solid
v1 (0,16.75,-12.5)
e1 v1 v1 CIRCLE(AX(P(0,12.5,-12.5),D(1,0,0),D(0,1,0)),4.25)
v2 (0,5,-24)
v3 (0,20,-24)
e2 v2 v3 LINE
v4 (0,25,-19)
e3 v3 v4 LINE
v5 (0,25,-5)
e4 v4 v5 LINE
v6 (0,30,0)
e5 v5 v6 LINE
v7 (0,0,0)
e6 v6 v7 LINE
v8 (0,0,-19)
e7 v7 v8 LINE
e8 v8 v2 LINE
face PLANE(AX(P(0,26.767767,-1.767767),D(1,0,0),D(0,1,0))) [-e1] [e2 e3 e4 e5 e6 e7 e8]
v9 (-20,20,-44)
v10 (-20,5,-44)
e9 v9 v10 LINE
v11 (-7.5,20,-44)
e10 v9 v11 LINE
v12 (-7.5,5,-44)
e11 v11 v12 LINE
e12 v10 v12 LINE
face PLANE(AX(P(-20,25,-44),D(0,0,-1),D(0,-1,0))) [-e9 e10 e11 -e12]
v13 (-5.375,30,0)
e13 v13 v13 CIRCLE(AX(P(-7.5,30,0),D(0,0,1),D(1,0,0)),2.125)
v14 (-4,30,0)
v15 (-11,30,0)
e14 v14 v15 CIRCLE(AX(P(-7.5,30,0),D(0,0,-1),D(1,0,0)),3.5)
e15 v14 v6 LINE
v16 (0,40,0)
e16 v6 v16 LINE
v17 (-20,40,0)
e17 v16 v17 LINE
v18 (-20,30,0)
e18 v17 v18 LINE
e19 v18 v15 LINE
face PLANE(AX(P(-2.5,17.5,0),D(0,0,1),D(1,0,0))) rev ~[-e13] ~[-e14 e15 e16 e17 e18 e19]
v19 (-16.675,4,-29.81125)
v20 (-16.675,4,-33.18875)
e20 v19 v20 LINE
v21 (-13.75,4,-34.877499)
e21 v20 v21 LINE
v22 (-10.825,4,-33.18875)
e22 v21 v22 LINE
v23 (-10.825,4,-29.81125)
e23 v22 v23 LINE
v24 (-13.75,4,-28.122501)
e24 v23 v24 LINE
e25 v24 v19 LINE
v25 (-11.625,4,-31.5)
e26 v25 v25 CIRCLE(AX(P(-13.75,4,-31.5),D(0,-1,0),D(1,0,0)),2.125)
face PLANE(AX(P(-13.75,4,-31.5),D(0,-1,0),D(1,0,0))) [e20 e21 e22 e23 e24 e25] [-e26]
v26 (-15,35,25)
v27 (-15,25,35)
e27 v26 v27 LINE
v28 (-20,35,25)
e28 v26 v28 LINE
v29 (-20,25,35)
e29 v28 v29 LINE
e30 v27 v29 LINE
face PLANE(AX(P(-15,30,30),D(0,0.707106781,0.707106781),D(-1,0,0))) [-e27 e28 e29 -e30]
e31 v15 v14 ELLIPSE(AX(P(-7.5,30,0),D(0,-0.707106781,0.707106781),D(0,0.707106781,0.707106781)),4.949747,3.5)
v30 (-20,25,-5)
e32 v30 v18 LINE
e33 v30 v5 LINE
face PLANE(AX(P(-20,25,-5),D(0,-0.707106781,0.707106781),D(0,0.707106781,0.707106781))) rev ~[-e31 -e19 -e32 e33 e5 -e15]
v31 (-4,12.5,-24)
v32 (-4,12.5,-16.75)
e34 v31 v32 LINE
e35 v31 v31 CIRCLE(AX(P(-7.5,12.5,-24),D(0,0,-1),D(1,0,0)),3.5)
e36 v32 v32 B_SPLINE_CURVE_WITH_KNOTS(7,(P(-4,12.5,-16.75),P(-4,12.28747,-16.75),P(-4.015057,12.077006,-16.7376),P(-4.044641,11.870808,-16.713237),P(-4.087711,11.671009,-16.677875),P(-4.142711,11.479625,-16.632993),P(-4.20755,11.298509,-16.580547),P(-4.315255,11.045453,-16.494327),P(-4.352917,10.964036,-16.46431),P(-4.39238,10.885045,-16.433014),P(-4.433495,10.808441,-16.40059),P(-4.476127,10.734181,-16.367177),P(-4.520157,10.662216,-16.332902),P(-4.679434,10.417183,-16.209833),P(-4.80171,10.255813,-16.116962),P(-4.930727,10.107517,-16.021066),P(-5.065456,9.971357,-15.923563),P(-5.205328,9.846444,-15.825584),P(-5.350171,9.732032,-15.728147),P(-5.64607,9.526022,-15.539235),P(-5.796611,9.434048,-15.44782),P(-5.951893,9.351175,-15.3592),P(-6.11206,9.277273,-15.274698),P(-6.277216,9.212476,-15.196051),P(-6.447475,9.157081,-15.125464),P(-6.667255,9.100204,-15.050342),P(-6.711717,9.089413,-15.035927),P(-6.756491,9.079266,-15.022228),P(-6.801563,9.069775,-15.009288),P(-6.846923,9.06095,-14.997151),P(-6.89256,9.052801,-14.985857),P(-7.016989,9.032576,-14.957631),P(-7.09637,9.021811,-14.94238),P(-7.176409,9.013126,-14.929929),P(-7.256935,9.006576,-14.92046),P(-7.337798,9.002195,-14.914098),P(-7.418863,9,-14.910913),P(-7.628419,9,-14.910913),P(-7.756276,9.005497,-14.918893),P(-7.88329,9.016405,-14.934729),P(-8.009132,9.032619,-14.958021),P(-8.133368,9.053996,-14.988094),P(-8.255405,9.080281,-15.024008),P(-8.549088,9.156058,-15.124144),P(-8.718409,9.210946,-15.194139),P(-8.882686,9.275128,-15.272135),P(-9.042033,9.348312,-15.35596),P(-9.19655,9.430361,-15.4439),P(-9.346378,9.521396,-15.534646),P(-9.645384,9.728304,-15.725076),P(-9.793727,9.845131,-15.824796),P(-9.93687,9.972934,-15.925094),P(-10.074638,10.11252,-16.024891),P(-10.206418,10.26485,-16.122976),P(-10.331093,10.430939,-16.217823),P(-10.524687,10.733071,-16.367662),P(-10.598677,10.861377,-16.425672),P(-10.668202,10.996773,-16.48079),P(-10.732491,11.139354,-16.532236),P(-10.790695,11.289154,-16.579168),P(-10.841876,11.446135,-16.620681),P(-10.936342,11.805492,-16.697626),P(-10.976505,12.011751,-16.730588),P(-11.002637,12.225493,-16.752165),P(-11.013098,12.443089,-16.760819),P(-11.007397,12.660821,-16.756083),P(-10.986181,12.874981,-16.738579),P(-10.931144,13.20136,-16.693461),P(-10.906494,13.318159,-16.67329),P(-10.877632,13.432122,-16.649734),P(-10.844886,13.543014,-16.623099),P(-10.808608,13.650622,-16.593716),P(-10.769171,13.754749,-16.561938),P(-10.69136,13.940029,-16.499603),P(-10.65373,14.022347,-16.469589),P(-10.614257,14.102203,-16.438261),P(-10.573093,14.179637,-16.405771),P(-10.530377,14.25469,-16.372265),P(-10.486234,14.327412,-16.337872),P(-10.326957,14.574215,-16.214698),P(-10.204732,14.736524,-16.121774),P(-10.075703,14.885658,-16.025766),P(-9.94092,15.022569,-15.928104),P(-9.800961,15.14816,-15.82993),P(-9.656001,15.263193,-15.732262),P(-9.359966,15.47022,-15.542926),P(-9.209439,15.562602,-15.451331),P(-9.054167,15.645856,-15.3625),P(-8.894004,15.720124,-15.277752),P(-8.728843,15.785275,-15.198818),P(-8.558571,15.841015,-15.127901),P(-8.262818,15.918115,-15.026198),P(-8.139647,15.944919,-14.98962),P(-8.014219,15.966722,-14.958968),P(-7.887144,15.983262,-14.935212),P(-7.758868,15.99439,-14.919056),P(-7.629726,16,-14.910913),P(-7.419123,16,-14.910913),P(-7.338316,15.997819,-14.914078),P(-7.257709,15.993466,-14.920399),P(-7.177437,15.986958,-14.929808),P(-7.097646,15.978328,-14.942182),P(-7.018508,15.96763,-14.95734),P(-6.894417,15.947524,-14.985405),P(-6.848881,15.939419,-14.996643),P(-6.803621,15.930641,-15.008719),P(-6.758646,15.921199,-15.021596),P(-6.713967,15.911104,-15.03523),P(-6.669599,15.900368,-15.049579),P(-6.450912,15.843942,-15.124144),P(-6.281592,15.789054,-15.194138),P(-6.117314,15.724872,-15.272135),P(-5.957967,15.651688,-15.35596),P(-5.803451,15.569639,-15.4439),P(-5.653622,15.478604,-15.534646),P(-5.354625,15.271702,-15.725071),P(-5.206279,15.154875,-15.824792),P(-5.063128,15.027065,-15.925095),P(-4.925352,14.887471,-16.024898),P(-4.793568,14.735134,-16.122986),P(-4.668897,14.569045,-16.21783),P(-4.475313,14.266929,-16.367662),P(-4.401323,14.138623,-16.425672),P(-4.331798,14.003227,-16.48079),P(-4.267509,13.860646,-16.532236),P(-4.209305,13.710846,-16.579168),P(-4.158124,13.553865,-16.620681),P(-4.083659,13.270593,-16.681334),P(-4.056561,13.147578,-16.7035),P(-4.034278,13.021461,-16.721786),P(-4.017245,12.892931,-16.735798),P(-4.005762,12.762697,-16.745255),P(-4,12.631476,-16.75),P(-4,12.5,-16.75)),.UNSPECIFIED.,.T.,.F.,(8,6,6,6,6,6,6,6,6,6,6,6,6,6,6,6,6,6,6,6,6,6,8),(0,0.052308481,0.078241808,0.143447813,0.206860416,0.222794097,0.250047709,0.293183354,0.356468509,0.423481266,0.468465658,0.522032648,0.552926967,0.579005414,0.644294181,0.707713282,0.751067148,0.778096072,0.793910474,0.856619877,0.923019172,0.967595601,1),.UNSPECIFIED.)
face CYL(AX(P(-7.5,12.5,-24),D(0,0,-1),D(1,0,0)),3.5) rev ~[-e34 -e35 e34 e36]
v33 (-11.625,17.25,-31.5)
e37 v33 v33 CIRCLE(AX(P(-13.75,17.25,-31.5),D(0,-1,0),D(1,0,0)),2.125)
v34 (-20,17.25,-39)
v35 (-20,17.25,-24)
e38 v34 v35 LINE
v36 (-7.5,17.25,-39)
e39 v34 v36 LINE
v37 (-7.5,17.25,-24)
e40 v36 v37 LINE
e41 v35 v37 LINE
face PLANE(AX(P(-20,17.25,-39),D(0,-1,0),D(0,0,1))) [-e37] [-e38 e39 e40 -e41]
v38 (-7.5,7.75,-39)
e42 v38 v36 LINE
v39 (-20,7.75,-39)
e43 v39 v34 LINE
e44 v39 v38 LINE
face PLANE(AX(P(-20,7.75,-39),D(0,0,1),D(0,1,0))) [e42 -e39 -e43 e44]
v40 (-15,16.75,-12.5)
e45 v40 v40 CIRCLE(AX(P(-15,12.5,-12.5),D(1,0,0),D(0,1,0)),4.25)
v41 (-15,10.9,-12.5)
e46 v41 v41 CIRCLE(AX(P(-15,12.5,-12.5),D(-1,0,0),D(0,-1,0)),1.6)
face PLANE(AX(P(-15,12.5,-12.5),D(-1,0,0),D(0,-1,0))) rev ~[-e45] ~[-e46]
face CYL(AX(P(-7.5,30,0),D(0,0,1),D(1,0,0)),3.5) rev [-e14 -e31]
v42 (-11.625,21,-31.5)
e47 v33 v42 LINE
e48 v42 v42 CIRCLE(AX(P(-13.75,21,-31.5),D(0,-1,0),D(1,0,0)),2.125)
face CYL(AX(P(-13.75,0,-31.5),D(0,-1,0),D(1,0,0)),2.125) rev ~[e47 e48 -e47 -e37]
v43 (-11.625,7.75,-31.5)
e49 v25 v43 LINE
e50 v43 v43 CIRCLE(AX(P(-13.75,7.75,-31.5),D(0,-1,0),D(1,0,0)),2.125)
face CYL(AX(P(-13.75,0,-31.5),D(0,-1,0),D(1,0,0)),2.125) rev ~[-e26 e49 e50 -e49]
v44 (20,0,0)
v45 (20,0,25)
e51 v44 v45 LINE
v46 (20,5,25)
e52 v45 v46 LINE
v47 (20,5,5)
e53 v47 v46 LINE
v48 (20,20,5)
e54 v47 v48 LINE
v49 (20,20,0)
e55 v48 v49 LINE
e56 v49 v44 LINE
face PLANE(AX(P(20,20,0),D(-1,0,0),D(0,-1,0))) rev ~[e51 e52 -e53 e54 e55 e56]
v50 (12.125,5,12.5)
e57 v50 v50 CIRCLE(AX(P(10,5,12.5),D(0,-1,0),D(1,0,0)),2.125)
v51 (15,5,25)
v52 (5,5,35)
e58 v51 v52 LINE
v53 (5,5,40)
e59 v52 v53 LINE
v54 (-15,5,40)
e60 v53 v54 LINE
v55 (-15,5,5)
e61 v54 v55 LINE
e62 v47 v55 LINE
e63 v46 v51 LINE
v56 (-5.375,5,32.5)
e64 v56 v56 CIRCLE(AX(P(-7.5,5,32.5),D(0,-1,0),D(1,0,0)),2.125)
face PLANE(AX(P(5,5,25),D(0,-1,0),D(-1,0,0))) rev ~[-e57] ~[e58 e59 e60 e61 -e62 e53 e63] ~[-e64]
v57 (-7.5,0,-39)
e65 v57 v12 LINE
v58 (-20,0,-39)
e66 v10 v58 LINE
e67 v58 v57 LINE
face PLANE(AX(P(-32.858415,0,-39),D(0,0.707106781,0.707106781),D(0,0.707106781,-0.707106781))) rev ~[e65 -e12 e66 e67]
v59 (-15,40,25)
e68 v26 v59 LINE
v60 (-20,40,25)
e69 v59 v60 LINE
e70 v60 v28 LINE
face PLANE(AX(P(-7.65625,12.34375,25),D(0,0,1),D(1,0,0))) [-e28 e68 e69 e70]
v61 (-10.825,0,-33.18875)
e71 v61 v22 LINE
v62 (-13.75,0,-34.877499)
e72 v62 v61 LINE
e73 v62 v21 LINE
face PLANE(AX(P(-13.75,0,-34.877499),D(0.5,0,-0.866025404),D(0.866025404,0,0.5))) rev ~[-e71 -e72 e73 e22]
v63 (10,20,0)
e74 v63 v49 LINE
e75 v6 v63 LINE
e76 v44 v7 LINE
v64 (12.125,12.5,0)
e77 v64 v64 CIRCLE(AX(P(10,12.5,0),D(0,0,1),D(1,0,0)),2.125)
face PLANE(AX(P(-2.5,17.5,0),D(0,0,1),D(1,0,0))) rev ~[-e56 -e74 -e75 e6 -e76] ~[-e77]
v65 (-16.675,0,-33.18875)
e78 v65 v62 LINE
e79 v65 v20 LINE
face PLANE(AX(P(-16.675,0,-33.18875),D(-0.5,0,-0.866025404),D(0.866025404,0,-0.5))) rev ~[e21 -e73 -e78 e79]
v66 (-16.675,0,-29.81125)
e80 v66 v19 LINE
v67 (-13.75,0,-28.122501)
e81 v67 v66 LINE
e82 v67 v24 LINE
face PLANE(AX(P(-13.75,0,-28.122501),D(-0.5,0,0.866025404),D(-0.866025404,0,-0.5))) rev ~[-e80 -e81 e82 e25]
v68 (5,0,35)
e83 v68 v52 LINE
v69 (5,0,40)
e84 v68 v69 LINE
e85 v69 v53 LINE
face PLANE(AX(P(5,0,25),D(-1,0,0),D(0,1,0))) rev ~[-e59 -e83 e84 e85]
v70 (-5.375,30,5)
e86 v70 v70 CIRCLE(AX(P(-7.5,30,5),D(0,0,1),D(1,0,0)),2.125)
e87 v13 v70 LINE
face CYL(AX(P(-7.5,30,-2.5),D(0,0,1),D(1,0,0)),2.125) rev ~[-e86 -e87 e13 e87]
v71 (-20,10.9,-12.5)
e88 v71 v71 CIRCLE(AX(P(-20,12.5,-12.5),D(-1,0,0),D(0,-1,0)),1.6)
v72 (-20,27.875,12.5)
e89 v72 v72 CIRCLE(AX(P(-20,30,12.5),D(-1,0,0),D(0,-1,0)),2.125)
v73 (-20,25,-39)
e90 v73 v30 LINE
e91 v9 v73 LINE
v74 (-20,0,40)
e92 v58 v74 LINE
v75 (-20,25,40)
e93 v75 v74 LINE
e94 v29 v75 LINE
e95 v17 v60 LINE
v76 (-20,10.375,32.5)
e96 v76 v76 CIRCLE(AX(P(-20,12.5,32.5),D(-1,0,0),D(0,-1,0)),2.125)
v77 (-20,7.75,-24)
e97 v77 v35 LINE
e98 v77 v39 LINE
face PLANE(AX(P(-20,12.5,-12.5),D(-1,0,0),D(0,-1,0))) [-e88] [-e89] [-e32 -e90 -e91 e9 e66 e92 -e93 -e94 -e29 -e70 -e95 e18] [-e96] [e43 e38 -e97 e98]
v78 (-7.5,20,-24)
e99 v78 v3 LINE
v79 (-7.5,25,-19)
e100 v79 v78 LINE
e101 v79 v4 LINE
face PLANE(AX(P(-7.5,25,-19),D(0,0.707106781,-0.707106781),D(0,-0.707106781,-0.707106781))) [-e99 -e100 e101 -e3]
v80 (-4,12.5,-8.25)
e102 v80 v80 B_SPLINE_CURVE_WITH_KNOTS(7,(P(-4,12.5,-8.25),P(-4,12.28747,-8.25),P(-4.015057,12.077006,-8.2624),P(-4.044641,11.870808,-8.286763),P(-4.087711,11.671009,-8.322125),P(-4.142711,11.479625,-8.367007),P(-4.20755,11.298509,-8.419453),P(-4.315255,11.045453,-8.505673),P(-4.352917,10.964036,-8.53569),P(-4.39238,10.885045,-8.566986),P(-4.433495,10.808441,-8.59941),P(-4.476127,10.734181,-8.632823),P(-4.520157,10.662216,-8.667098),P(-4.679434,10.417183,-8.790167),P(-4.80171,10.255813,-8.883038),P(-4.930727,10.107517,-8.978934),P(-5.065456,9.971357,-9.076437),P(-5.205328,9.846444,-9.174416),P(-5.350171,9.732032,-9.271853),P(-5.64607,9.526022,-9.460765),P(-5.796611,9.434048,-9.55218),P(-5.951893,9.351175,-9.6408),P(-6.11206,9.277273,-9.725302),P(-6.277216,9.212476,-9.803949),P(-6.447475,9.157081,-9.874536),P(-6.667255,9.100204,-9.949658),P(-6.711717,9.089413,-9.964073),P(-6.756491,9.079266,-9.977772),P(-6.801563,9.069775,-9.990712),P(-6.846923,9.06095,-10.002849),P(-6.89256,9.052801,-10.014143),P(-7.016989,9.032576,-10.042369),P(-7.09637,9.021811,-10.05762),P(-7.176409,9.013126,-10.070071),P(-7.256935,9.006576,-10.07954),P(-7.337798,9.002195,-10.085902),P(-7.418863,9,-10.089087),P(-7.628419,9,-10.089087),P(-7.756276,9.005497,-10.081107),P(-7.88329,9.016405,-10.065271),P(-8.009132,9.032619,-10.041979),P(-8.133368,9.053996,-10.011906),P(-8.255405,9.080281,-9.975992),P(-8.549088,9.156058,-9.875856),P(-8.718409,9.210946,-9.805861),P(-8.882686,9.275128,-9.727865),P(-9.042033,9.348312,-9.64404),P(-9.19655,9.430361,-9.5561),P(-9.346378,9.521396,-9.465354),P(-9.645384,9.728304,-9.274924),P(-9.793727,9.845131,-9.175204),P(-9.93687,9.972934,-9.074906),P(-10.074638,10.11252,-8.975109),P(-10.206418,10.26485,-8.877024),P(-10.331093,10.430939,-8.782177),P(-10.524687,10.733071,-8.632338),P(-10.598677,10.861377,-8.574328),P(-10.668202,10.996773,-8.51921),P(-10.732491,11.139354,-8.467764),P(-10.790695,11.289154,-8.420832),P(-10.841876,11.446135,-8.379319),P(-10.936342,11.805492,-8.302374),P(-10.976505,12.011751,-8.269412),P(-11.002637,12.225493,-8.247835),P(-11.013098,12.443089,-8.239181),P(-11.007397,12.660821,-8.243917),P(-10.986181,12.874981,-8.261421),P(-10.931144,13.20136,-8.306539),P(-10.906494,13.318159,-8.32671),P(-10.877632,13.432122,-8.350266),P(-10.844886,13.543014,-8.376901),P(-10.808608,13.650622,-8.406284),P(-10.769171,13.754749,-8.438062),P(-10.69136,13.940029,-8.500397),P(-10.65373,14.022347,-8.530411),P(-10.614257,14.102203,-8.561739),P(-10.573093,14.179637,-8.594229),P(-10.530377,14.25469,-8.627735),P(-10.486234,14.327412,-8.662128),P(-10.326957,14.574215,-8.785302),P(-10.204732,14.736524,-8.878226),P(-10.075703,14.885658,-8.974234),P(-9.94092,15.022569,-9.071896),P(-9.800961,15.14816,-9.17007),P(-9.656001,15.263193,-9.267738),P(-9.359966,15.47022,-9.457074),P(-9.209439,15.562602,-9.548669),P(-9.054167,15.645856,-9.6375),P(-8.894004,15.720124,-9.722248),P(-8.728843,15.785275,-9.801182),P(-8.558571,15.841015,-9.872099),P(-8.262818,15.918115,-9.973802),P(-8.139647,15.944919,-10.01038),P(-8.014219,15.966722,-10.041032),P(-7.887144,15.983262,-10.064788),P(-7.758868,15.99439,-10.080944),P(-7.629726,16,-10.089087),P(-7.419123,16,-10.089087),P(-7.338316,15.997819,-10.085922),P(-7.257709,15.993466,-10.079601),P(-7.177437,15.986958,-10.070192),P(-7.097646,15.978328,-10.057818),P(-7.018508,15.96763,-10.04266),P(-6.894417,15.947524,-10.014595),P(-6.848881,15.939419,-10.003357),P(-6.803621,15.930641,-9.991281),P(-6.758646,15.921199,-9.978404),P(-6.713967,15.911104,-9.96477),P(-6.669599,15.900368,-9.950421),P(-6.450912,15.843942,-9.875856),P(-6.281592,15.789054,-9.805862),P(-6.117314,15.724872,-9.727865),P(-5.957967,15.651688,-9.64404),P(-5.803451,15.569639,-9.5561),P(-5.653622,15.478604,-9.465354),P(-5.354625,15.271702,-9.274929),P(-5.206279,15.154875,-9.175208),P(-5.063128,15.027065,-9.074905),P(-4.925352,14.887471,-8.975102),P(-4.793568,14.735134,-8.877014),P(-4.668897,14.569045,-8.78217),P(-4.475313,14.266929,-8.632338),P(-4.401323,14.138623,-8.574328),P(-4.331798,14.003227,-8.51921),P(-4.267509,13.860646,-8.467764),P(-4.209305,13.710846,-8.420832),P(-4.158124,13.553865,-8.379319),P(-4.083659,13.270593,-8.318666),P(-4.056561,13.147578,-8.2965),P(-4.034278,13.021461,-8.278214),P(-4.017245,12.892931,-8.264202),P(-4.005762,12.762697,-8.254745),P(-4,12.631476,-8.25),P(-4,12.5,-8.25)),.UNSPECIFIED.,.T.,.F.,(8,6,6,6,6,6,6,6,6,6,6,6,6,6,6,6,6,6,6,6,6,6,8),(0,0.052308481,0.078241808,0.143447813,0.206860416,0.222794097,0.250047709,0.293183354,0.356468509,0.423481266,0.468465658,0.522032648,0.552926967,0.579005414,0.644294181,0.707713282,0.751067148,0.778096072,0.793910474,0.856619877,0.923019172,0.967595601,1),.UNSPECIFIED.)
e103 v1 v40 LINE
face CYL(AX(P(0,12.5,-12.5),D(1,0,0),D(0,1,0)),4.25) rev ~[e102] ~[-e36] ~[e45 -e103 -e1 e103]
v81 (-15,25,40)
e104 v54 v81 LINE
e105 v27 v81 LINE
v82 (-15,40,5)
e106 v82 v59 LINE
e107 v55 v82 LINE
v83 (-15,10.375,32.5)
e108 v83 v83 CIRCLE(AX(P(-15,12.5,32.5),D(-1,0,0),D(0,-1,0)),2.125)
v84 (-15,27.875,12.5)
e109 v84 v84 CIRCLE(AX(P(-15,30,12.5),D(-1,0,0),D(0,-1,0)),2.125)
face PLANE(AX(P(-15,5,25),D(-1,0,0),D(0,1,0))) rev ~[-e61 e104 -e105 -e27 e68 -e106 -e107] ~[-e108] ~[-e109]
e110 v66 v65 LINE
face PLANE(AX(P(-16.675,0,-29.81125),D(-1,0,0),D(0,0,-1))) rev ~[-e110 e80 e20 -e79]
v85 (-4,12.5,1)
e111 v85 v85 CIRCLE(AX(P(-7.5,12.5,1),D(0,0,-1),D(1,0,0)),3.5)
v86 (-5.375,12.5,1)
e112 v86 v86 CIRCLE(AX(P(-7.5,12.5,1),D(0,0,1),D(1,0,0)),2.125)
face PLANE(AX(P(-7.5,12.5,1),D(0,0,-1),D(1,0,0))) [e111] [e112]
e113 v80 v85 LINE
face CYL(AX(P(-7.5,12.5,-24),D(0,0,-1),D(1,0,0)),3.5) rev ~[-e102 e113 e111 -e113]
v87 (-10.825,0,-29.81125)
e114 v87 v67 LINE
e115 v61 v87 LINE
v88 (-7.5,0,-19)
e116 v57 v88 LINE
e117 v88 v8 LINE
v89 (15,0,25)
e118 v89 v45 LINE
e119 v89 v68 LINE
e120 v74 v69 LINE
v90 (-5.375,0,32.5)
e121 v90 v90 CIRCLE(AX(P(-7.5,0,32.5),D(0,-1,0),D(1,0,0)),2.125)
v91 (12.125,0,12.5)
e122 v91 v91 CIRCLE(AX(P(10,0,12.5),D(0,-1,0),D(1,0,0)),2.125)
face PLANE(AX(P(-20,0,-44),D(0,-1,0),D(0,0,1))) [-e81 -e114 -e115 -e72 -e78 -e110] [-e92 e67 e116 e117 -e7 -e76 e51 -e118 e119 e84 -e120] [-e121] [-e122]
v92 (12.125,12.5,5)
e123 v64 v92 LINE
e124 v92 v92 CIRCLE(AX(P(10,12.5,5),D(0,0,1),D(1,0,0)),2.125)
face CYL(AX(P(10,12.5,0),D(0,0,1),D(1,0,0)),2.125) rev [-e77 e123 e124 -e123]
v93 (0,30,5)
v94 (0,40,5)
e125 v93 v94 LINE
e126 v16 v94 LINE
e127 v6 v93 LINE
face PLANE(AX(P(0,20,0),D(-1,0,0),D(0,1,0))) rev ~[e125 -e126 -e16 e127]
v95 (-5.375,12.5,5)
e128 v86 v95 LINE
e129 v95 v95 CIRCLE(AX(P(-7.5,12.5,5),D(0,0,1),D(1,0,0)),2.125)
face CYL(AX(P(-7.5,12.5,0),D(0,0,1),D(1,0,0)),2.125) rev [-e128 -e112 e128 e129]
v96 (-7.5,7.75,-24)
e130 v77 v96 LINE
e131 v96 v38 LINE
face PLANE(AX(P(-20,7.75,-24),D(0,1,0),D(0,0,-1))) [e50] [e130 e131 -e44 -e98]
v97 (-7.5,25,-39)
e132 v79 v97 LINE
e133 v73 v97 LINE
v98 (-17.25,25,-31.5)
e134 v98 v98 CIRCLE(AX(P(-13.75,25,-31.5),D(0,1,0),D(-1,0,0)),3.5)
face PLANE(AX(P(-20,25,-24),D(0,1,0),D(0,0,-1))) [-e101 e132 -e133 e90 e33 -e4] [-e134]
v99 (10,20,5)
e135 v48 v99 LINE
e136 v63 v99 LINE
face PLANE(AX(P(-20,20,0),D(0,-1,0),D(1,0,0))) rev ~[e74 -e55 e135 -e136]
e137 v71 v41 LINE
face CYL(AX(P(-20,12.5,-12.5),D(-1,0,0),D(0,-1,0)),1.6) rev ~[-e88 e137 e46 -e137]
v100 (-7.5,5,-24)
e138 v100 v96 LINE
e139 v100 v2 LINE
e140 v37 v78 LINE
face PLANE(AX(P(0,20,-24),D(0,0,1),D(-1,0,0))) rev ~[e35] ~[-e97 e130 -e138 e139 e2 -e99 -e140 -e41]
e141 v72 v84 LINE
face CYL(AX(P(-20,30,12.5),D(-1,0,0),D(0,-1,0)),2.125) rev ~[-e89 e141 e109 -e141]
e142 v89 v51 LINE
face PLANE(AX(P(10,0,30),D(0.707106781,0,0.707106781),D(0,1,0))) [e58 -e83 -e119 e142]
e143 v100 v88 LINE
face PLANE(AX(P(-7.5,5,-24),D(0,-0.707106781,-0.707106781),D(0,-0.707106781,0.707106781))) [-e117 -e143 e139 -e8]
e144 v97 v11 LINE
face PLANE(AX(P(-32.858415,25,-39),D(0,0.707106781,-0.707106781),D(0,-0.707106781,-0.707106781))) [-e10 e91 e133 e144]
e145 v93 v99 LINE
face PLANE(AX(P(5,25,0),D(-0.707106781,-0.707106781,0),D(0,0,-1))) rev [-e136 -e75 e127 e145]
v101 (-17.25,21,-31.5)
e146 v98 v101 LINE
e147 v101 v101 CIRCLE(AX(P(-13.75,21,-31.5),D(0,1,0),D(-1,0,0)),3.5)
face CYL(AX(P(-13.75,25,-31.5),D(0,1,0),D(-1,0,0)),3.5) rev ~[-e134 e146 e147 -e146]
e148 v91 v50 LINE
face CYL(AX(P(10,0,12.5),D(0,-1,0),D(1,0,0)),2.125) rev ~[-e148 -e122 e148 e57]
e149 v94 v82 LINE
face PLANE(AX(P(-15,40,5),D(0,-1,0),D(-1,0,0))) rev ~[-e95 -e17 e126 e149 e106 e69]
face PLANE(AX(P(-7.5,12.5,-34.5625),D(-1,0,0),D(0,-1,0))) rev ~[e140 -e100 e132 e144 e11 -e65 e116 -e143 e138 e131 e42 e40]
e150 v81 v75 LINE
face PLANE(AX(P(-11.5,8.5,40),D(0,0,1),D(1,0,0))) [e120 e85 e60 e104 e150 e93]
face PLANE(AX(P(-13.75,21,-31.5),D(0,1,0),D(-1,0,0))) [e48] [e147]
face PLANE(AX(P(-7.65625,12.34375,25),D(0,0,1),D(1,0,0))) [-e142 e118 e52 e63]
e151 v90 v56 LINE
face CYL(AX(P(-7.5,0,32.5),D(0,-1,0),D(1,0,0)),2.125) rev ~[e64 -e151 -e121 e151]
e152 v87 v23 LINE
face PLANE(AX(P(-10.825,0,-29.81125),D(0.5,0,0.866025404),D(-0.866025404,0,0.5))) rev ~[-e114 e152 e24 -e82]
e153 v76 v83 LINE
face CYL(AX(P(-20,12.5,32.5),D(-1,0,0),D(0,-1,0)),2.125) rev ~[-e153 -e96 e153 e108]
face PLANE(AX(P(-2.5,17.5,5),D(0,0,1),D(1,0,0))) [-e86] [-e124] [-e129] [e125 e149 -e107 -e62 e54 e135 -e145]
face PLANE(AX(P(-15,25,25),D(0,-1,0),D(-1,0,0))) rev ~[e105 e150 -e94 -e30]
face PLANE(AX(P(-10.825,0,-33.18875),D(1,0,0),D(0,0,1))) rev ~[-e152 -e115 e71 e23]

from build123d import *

# Parameters (mm, degrees)
F0_R         = 2.125
F1_DEPTH     = 5
F3_DEPTH     = 20
F5_DEPTH     = 15
F6_SIZE      = 10
F7_R         = 2.125
F8_DEPTH     = 5
F9_R         = 2.125
F10_DEPTH    = 5
F11_W        = 40
F11_H        = 20
F11_R        = 2.125
F12_DEPTH    = 24
F14_DEPTH    = 25
F15_R        = 4.25
F16_DEPTH    = 20
F17_R        = 3.5
F18_DEPTH    = 25
F19_W        = 20
F19_H        = 24
F20_DEPTH    = 5
F22_DEPTH    = 12.5
F23_T4_DEPTH = 20
F23_S5_R     = 2.125
F23_T6_DEPTH = 12
F23_T7_DEPTH = 38.2168298797
F23_T9_DEPTH = 20.3584149398
F24_R        = 3.5
F25_DEPTH    = 44.001
F26_R        = 4.25
F26_R_2      = 1.6
F27_DEPTH    = 5
F28_R        = 2.125
F29_DEPTH    = 40.001
F31_DEPTH    = 4
F32_R        = 3.5
F33_DEPTH    = 4


# Not quite as in the source:
# - a fillet or chamfer that OpenCascade refuses, or shapes differently, is made with other operations: its cross-section is extruded or revolved along the edge and cut away or added


with BuildPart() as f1:
    # F0 (on Top) → F1 (new body)
    with BuildSketch(Plane.XY):
        Polygon((0, 20), (0, 40), (-20, 40), (-20, 0), (20, 0), (20, 20), align=None)
        with Locations((-7.5, 12.5)):
            Circle(F0_R, mode=Mode.SUBTRACT)
        with Locations((10, 12.5)):
            Circle(F0_R, mode=Mode.SUBTRACT)
        with Locations((-7.5, 30)):
            Circle(F0_R, mode=Mode.SUBTRACT)
    extrude(amount=F1_DEPTH)

    # F2 (on face) → F3 (join)
    with BuildSketch(Plane.XY.offset(5)):
        Polygon((-15, 40), (-20, 40), (-20, 0), (20, 0), (20, 5), (-15, 5), align=None)
    extrude(amount=F3_DEPTH)

    # F4 (on face) → F5 (join)
    with BuildSketch(Plane.XY.offset(25)):
        Polygon((-15, 5), (-15, 25), (-20, 25), (-20, 0), (5, 0), (5, 5), align=None)
    extrude(amount=F5_DEPTH)

    # F6
    f6_edges = [f1.edges().sort_by_distance(p)[0] for p in [
        (0, 20, 2.5),
        (-17.5, 25, 25),
        (5, 2.5, 25),
    ]]
    chamfer(f6_edges, length=F6_SIZE)

    # F7 (on face) → F8 (cut)
    with BuildSketch(Plane.XZ):
        with Locations((-7.5, 32.5)):
            Circle(F7_R)
        with Locations((10, 12.5)):
            Circle(F7_R)
    extrude(amount=-F8_DEPTH, mode=Mode.SUBTRACT)

    # F9 (on face) → F10 (cut)
    with BuildSketch(Plane(origin=(-20, 0, 0), x_dir=(0, -1, 0), z_dir=(-1, 0, 0))):
        with Locations((-12.5, 32.5)):
            Circle(F9_R)
        with Locations((-30, 12.5)):
            Circle(F9_R)
    extrude(amount=-F10_DEPTH, mode=Mode.SUBTRACT)

    # F11 (on face) → F12 (join)
    with BuildSketch(Plane(origin=(0, 0, 0), x_dir=(1, 0, 0), z_dir=(0, 0, -1))):
        with Locations((0, -10)):
            Rectangle(F11_W, F11_H)
        with Locations((-7.5, -12.5)):
            Circle(F11_R, mode=Mode.SUBTRACT)
        with Locations((10, -12.5)):
            Circle(F11_R, mode=Mode.SUBTRACT)
    extrude(amount=F12_DEPTH)

    # F13 (on face) → F14 (cut)
    with BuildSketch(Plane(origin=(0, 20, 0), x_dir=(-1, 0, 0), z_dir=(0, 1, 0))):
        Polygon((0, -24), (0, -11.5), (0, 0), (-20, 0), (-20, -24), align=None)
    extrude(amount=-F14_DEPTH, mode=Mode.SUBTRACT)

    # F15 (on face) → F16 (cut)
    with BuildSketch(Plane.YZ):
        with Locations((12.5, -12.5)):
            Circle(F15_R)
    extrude(amount=-F16_DEPTH, mode=Mode.SUBTRACT)

    # F17 (on face) → F18 (cut)
    with BuildSketch(Plane(origin=(0, 0, -24), x_dir=(1, 0, 0), z_dir=(0, 0, -1))):
        with Locations((-7.5, -12.5)):
            Circle(F17_R)
    extrude(amount=-F18_DEPTH, mode=Mode.SUBTRACT)

    # F19 (on face) → F20 (join)
    with BuildSketch(Plane(origin=(0, 20, 0), x_dir=(-1, 0, 0), z_dir=(0, 1, 0))):
        with Locations((10, -12)):
            Rectangle(F19_W, F19_H)
    extrude(amount=F20_DEPTH)

    # F21 (on face) → F22 (join)
    with BuildSketch(Plane(origin=(-20, 0, 0), x_dir=(0, -1, 0), z_dir=(-1, 0, 0))):
        Polygon((-17.25, -24), (-25, -24), (-25, -44), (0, -44), (0, -24), (-7.75, -24), (-7.75, -39), (-17.25, -39), align=None)
    extrude(amount=-F22_DEPTH)

    # F23: chamfer of 5 on 5 edges, made by hand


with BuildPart() as f23_tool2:
    # F23_s3 → F23_t4 (new body)
    with BuildSketch(Plane.YZ.offset(-20)):
        Polygon((25, -5), (30, 0), (25, 0), align=None)
    extrude(amount=F23_T4_DEPTH)

    # F23_s5 → F23_t6 (cut, symmetric)
    with BuildSketch(Plane.XY.offset(-2.5)):
        with Locations((-7.5, 30)):
            Circle(F23_S5_R)
    extrude(amount=F23_T6_DEPTH, both=True, mode=Mode.SUBTRACT)


with BuildPart() as f1_1:
    add(f1.part)

    # F23_t1: union F23_tool2
    add(f23_tool2.part)

    # F23_s8 → F23_t7 (cut)
    with BuildSketch(Plane.YZ.offset(-32.8584149398)):
        Polygon((25, -39), (20, -44), (25, -44), align=None)
        Polygon((0, -39), (5, -44), (0, -44), align=None)
    extrude(amount=F23_T7_DEPTH, mode=Mode.SUBTRACT)

    # F23_s10 → F23_t9 (cut)
    with BuildSketch(Plane.YZ.offset(-7.5)):
        Polygon((5, -24), (0, -19), (0, -24), align=None)
        Polygon((25, -19), (20, -24), (25, -24), align=None)
    extrude(amount=F23_T9_DEPTH, mode=Mode.SUBTRACT)

    # F24 (on face) → F25 (cut, through all)
    with BuildSketch(Plane(origin=(0, 0, 0), x_dir=(1, 0, 0), z_dir=(0, 0, -1))):
        with Locations((-7.5, -30)):
            Circle(F24_R)
    extrude(amount=F25_DEPTH, mode=Mode.SUBTRACT)

    # F26 (on face) → F27 (join)
    with BuildSketch(Plane(origin=(-20, 0, 0), x_dir=(0, -1, 0), z_dir=(-1, 0, 0))):
        with Locations((-12.5, -12.5)):
            Circle(F26_R)
        with Locations((-12.5, -12.5)):
            Circle(F26_R_2, mode=Mode.SUBTRACT)
    extrude(amount=-F27_DEPTH)

    # F28 (on face) → F29 (cut, through all)
    with BuildSketch(Plane.XZ):
        with Locations((-13.75, -31.5)):
            Circle(F28_R)
    extrude(amount=-F29_DEPTH, mode=Mode.SUBTRACT)

    # F30 (on face) → F31 (cut)
    with BuildSketch(Plane.XZ):
        Polygon((-10.825, -33.1887495374), (-10.825, -29.8112504626), (-13.75, -28.1225009252), (-16.675, -29.8112504626), (-16.675, -33.1887495374), (-13.75, -34.8774990748), align=None)
    extrude(amount=-F31_DEPTH, mode=Mode.SUBTRACT)

    # F32 (on face) → F33 (cut)
    with BuildSketch(Plane(origin=(0, 25, 0), x_dir=(-1, 0, 0), z_dir=(0, 1, 0))):
        with Locations((13.75, -31.5)):
            Circle(F32_R)
    extrude(amount=-F33_DEPTH, mode=Mode.SUBTRACT)


solid = f1_1.part
